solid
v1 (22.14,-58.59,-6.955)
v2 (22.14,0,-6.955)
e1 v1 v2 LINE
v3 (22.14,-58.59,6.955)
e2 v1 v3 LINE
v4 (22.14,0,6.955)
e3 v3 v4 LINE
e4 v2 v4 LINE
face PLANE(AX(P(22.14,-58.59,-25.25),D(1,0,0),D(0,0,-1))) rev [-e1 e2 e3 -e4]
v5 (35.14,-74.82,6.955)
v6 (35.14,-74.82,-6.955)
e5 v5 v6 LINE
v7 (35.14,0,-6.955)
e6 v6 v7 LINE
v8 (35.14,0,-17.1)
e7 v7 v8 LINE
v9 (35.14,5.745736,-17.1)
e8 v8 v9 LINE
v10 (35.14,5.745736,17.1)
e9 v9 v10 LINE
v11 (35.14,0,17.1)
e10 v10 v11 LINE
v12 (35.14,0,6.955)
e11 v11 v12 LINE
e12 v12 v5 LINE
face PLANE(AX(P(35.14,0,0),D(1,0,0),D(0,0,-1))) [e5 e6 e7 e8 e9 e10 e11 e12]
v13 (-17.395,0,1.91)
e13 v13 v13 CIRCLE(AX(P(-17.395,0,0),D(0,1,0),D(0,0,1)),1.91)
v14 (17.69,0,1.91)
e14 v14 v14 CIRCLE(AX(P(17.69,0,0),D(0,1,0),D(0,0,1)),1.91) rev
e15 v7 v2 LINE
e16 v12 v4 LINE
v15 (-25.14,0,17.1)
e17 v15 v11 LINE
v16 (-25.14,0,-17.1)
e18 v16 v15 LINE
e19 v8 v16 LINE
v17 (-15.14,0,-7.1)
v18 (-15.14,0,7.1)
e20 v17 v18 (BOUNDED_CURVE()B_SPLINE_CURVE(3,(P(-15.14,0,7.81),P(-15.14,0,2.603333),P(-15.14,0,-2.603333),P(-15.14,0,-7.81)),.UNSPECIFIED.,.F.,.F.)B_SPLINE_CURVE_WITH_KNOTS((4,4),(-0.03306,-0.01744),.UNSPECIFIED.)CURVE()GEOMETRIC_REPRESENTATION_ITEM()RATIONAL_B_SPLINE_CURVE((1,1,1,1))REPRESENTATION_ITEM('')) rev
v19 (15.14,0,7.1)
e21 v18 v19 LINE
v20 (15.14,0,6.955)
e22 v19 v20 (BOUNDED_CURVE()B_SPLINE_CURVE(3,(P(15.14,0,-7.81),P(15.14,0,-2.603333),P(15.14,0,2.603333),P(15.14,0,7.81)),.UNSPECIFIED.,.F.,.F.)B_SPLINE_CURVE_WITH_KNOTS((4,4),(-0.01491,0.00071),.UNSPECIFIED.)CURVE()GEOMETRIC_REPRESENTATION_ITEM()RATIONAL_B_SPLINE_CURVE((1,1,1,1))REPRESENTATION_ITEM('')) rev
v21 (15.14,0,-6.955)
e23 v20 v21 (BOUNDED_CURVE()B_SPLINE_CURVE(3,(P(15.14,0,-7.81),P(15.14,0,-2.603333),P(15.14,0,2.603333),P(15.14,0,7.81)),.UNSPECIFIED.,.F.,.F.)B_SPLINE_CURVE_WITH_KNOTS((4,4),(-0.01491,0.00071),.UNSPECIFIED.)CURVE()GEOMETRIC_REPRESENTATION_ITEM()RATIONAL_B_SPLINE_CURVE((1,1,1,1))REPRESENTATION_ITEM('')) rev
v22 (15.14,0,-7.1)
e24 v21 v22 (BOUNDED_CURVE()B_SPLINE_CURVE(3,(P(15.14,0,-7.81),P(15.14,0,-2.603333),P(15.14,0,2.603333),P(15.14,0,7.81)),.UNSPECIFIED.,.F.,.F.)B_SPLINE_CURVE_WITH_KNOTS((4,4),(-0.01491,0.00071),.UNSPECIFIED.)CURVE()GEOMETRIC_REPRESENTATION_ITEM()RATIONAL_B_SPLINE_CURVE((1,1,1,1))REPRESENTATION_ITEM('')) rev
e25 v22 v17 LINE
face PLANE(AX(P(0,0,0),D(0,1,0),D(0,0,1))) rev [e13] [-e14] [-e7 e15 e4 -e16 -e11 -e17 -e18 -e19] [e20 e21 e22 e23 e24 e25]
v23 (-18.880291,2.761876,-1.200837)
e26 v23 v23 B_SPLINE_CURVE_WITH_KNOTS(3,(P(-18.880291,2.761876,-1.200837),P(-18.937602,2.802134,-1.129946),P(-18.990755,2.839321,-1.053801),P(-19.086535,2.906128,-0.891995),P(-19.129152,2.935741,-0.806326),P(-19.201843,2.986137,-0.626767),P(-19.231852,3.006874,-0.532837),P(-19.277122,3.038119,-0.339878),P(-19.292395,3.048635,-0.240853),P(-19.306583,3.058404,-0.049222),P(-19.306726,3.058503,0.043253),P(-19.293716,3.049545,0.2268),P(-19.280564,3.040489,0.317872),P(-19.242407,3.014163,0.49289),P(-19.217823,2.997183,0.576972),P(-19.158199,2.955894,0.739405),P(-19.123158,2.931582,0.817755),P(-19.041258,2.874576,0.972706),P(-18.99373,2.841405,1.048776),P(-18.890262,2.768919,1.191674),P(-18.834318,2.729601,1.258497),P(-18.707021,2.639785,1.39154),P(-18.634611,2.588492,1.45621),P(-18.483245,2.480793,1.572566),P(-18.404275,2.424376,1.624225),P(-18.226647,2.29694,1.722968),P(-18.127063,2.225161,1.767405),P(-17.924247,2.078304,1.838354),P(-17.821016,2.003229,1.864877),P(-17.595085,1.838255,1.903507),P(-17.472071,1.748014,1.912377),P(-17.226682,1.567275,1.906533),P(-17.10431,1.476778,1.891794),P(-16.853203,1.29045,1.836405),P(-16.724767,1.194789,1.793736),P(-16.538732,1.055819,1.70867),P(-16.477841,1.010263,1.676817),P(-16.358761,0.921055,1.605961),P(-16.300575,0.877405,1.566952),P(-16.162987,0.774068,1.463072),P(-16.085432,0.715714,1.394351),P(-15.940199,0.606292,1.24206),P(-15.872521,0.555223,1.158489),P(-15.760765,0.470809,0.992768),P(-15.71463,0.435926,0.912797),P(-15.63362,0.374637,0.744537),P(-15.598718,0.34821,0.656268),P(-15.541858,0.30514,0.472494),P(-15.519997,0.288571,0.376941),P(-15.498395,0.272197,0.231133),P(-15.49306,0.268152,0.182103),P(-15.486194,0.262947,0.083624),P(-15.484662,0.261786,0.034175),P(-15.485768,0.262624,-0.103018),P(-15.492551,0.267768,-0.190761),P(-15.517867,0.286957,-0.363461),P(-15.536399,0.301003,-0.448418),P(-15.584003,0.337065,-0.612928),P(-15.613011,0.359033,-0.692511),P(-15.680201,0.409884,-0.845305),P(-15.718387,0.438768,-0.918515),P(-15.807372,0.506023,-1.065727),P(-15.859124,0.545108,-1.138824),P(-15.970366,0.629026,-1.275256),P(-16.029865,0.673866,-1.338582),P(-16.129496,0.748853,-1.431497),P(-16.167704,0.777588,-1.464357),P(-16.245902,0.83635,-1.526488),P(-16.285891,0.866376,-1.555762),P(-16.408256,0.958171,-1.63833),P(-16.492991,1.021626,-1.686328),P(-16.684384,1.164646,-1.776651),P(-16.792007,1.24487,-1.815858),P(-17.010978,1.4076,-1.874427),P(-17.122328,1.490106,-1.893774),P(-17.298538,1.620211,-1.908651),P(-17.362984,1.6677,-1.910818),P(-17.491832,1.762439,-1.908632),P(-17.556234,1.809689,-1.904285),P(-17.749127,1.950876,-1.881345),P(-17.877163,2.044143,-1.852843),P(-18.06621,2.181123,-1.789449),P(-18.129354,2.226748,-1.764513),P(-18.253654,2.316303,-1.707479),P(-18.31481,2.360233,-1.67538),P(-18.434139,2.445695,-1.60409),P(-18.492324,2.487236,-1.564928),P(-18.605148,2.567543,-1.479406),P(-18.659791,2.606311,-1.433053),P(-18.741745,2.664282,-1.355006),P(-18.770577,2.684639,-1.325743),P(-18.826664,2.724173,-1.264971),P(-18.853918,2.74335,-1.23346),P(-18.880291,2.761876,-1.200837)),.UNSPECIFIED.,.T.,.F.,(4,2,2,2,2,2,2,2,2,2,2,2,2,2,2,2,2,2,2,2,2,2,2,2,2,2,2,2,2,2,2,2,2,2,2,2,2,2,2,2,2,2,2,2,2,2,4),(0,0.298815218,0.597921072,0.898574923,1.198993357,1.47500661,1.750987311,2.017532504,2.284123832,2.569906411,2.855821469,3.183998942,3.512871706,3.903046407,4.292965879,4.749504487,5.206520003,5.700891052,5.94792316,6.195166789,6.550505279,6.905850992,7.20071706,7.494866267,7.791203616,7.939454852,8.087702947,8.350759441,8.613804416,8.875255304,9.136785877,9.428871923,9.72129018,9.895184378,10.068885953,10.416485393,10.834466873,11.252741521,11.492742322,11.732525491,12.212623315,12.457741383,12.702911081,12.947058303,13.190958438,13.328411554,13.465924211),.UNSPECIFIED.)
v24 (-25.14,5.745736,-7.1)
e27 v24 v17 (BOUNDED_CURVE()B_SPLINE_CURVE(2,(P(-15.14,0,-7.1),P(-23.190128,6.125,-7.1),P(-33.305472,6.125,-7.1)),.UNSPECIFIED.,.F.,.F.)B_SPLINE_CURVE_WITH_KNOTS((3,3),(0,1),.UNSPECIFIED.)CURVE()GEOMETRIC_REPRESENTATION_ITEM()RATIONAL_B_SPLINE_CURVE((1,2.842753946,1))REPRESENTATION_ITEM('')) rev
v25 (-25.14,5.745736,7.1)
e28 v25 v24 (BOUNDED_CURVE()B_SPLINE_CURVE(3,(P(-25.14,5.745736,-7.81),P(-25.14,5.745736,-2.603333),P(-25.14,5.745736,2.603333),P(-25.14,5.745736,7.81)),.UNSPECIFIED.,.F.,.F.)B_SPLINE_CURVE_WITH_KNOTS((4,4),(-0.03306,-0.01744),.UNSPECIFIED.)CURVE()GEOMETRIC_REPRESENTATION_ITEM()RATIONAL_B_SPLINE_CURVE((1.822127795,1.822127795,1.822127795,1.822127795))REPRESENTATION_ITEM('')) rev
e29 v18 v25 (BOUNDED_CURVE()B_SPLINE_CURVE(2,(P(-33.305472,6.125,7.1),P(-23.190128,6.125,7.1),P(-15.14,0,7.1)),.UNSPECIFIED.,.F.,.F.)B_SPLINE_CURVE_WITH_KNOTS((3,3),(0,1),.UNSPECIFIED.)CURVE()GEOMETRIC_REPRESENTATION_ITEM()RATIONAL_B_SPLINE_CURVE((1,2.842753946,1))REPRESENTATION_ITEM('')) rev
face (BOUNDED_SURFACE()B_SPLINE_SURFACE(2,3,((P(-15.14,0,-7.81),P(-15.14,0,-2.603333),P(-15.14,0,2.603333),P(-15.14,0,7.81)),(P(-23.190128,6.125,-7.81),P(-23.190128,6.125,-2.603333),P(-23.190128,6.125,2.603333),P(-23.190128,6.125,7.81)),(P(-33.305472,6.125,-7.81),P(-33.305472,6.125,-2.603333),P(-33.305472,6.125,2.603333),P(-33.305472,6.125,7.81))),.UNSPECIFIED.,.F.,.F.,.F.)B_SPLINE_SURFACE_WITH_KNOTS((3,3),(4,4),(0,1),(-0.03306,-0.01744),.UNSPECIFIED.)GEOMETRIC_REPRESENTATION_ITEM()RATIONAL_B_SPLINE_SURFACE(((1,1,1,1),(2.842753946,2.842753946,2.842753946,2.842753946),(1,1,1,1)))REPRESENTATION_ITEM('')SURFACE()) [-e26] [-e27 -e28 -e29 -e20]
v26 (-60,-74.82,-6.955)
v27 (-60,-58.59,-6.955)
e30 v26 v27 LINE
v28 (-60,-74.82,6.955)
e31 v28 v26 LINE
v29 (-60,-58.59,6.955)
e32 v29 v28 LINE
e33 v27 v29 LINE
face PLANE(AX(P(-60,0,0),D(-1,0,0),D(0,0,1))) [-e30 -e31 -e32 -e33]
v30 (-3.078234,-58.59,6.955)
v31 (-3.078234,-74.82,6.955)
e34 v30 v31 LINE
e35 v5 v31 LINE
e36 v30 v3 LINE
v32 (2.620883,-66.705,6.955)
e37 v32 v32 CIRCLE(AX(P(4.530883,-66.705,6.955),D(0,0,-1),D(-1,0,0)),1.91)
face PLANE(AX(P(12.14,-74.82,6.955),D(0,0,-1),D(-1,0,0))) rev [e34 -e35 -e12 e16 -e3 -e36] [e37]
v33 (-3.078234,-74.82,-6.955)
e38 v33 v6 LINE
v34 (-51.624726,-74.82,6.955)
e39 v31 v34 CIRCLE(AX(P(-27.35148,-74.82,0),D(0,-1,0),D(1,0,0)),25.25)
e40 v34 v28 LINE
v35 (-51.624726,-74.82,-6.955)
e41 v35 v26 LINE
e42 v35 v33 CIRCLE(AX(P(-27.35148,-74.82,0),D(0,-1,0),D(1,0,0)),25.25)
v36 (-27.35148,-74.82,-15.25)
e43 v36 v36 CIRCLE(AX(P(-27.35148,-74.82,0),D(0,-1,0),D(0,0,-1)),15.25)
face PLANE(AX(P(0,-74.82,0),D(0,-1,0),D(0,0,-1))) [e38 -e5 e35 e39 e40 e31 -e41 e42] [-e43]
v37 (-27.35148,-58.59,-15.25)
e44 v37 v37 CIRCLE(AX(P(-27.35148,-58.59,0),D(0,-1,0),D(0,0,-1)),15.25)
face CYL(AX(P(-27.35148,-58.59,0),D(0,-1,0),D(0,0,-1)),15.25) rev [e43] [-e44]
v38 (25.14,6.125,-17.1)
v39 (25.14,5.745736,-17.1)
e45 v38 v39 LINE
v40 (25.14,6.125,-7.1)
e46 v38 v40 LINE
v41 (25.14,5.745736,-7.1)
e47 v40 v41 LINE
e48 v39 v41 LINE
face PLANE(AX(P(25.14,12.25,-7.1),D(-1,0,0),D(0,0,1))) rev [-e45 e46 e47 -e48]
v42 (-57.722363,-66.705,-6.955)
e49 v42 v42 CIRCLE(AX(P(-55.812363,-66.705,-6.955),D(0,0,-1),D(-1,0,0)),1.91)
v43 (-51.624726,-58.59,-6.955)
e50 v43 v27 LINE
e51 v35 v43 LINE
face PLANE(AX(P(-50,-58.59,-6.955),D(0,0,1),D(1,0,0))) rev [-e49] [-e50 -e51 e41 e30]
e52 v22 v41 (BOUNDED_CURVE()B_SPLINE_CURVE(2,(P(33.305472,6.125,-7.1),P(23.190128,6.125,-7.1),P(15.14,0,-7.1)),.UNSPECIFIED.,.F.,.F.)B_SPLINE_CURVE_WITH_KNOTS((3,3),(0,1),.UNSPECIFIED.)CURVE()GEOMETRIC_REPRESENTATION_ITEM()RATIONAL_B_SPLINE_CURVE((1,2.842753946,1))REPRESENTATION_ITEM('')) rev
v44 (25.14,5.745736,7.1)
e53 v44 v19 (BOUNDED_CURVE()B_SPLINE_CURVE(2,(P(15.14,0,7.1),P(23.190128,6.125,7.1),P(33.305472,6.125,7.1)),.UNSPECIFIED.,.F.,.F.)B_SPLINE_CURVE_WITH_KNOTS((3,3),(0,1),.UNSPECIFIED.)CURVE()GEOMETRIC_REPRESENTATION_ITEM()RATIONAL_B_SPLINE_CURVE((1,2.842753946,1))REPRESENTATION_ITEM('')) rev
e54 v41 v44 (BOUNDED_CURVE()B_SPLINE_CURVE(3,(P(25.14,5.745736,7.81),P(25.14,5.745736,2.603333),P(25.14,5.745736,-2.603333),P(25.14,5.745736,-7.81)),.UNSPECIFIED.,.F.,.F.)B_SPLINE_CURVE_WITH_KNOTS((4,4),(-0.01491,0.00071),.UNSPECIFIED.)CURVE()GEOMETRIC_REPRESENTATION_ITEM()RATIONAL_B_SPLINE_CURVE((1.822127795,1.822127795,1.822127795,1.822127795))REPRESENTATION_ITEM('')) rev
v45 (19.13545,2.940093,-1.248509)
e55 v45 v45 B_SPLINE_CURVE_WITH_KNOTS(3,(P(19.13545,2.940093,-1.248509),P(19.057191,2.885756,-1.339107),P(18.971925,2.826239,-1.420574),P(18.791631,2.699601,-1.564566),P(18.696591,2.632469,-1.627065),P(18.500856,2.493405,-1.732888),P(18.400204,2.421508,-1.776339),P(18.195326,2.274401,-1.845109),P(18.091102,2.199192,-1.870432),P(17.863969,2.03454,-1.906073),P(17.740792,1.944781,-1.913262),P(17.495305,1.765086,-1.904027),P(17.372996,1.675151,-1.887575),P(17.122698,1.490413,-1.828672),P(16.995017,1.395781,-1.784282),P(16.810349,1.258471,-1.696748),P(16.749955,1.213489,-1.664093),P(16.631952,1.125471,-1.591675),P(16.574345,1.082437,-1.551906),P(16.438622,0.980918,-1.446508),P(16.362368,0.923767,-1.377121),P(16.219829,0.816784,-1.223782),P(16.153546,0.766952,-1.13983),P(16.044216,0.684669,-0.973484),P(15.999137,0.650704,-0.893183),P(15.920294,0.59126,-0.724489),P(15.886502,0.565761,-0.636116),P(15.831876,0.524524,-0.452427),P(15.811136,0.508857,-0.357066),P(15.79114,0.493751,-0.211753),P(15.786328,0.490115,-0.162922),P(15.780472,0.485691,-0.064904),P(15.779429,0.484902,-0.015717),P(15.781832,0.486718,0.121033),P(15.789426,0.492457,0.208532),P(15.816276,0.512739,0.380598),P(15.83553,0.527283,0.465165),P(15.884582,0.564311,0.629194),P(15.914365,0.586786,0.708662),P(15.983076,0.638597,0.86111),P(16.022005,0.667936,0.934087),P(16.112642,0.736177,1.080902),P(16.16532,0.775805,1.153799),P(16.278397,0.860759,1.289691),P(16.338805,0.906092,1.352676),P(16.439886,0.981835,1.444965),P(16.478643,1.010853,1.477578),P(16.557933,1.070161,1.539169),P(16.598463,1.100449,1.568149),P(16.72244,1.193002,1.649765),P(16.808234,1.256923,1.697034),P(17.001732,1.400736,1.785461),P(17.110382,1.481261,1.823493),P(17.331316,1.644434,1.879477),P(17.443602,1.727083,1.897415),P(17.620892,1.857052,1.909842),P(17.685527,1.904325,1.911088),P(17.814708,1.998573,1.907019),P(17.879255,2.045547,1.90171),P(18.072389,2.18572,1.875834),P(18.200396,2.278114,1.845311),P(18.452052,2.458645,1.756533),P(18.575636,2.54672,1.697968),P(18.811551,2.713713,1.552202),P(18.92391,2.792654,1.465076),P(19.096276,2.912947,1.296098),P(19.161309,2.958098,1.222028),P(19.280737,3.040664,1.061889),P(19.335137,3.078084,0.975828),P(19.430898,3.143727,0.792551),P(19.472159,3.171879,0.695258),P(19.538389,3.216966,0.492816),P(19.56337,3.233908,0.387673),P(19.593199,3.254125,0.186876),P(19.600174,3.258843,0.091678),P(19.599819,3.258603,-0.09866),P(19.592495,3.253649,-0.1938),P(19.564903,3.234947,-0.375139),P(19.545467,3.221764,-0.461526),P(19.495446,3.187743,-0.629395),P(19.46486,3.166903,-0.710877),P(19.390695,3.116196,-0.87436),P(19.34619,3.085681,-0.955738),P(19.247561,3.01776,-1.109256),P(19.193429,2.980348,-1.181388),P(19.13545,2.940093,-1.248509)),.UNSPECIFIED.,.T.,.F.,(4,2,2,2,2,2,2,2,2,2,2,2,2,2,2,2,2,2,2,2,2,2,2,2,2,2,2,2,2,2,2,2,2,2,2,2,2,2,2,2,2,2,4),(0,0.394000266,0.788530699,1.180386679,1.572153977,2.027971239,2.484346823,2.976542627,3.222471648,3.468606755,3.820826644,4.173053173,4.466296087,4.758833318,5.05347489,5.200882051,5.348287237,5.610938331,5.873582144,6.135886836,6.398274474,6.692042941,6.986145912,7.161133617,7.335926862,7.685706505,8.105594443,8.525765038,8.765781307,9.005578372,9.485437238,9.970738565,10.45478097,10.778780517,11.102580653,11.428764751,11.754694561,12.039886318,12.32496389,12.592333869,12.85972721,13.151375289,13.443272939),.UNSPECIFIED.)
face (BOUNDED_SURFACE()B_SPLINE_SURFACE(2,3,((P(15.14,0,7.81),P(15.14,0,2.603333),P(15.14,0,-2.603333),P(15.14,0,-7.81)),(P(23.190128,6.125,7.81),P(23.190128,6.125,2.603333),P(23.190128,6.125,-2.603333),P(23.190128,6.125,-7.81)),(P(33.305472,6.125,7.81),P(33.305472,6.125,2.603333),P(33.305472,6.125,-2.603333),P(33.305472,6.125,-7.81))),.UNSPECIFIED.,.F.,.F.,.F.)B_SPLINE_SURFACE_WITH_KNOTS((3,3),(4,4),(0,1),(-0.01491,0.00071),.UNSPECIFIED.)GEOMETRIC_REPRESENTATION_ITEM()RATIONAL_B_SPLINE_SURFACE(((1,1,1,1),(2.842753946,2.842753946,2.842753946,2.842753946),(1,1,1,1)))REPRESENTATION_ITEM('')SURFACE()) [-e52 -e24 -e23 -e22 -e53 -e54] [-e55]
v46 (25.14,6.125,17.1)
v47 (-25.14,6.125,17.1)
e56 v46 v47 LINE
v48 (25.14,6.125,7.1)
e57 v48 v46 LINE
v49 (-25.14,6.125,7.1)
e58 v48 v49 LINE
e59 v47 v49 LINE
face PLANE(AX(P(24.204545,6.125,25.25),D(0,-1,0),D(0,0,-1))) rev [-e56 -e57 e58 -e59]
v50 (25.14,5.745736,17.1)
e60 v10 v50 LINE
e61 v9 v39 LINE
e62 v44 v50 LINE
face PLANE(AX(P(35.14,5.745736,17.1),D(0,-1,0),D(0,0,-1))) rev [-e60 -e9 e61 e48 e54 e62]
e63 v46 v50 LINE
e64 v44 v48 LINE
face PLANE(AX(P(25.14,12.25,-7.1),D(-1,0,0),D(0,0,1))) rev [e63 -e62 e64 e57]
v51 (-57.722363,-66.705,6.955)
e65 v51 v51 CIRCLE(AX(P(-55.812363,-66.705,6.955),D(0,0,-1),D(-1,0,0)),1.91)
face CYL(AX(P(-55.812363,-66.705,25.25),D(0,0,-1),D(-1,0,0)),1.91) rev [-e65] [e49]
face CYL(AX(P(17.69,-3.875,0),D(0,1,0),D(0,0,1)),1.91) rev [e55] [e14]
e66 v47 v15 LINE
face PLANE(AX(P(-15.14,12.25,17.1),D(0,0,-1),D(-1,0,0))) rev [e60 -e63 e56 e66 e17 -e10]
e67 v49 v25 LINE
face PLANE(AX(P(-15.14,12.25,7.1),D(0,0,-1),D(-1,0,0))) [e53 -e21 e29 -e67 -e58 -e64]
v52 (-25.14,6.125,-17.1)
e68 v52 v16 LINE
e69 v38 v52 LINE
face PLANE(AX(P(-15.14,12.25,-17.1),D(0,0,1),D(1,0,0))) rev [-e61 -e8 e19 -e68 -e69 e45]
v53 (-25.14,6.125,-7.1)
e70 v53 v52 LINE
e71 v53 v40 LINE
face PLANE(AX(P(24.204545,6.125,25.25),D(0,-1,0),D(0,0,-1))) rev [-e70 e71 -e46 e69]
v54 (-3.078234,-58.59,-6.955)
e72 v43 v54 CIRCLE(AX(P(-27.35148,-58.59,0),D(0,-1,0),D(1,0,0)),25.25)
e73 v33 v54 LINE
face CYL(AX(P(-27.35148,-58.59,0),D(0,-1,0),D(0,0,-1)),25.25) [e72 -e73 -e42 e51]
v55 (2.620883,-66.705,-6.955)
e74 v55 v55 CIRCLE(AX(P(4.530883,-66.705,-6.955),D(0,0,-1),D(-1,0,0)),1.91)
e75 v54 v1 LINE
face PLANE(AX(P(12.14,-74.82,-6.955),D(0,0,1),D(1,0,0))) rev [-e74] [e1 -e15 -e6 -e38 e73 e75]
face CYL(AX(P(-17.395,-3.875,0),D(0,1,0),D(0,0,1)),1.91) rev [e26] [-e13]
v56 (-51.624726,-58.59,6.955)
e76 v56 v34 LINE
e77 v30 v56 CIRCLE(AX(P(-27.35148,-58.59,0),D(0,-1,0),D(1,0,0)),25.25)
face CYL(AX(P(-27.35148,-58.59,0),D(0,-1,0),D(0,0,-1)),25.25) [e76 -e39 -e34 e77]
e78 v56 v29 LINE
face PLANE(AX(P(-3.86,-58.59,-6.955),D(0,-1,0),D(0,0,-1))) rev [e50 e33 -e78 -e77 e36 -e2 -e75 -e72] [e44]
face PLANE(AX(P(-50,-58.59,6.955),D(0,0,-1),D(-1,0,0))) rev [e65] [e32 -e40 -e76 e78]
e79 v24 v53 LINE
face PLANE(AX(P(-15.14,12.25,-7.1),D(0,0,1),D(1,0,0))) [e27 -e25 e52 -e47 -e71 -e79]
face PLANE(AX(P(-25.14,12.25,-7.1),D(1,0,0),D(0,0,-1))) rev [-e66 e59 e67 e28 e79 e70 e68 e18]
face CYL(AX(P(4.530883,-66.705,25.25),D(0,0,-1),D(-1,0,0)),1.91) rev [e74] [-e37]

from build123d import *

# Parameters (mm, degrees)
SKETCH_1_W           = 50.28
SKETCH_1_H           = 34.2
SKETCH_1_W_2         = 30.28
SKETCH_1_H_2         = 14.2
EXTRUDE_1_DEPTH      = 12.25
SKETCH_4_W           = 13
SKETCH_4_H           = 13.91
EXTRUDE_1_2_DEPTH    = 74.82
SKETCH_5_W           = 13.91
SKETCH_5_H           = 16.23
EXTRUDE_2_DEPTH      = 16
SKETCH_7_R           = 25.25
SKETCH_7_R_2         = 15.25
EXTRUDE_2_2_DEPTH    = 16.23
SKETCH_15_R          = 1.91
CUT_EXTRUDE_6_DEPTH  = 97.964478439
SKETCH_16_W          = 13.91
SKETCH_16_H          = 16.23
EXTRUDE_4_DEPTH      = 10
SKETCH_17_R          = 1.91
CUT_EXTRUDE_7_DEPTH  = 102.16913771
SKETCH_18_W          = 49.344544624
SKETCH_18_H          = 6.125
CUT_EXTRUDE_8_DEPTH  = 105.840616652
SKETCH_19_W          = 34.2
SKETCH_19_H          = 6.125
CUT_EXTRUDE_9_DEPTH  = 10
SKETCH_21_R          = 1.91
CUT_EXTRUDE_10_DEPTH = 10
SKETCH_20_R          = 1.91
CUT_EXTRUDE_11_DEPTH = 10
FILLET_START         = -7.1
FILLET_1_DEPTH       = 14.2
FILLET_2_DEPTH       = 14.2
SKETCH_29_W          = 13.91
SKETCH_29_H          = 74.82
EXTRUDE_5_DEPTH      = 10
SKETCH_30_W          = 10
SKETCH_30_H          = 58.59
CUT_EXTRUDE_13_DEPTH = 102.16913771
SKETCH_32_W          = 34.2
SKETCH_32_H          = 5.745736365
EXTRUDE_6_DEPTH      = 10


with BuildPart() as part:
    # 草圖1 → Extrude 1 (new body)
    with BuildSketch(Plane(origin=(0, 0, 0), x_dir=(1, 0, 0), z_dir=(0, 1, 0))):
        Rectangle(SKETCH_1_W, SKETCH_1_H)
        Rectangle(SKETCH_1_W_2, SKETCH_1_H_2, mode=Mode.SUBTRACT)
    extrude(amount=EXTRUDE_1_DEPTH)

    # 草圖4 → Extrude 1 2 (add)
    with BuildSketch(Plane.XZ):
        with Locations((18.64, 0)):
            Rectangle(SKETCH_4_W, SKETCH_4_H)
    extrude(amount=EXTRUDE_1_2_DEPTH)

    # 草圖5 → Extrude 2 (add)
    with BuildSketch(Plane.ZY.offset(-12.14)):
        with Locations((0, -66.705)):
            Rectangle(SKETCH_5_W, SKETCH_5_H)
    extrude(amount=EXTRUDE_2_DEPTH)

    # 草圖7 → Extrude 2 2 (add)
    with BuildSketch(Plane(origin=(3.626674765, -74.82, 0), x_dir=(1, 0, 0), z_dir=(0, -1, 0))):
        with Locations((-30.978154344, 0)):
            Circle(SKETCH_7_R)
        with Locations((-30.978154344, 0)):
            Circle(SKETCH_7_R_2, mode=Mode.SUBTRACT)
    extrude(amount=-EXTRUDE_2_2_DEPTH)

    # 草圖15 → 除料-伸長6 (cut, through all)
    with BuildSketch(Plane(origin=(0, 0, -6.955), x_dir=(-1, 0, 0), z_dir=(0, 0, -1))):
        with Locations((-4.530883248, -66.705)):
            Circle(SKETCH_15_R)
    extrude(amount=-CUT_EXTRUDE_6_DEPTH, mode=Mode.SUBTRACT)

    # 草圖16 → 填料-伸長4 (add)
    with BuildSketch(Plane(origin=(-60, 0, 0), x_dir=(0, 0, -1), z_dir=(1, 0, 0))):
        with Locations((0, -66.705)):
            Rectangle(SKETCH_16_W, SKETCH_16_H)
    extrude(amount=EXTRUDE_4_DEPTH)

    # 草圖17 → 除料-伸長7 (cut, through all)
    with BuildSketch(Plane(origin=(0, 0, -6.955), x_dir=(-1, 0, 0), z_dir=(0, 0, -1))):
        with Locations((55.812362827, -66.705)):
            Circle(SKETCH_17_R)
    extrude(amount=-CUT_EXTRUDE_7_DEPTH, mode=Mode.SUBTRACT)

    # 草圖18 → 除料-伸長8 (cut, through all)
    with BuildSketch(Plane(origin=(0, 0, -17.1), x_dir=(-1, 0, 0), z_dir=(0, 0, -1))):
        with Locations((0.467727688, 9.1875)):
            Rectangle(SKETCH_18_W, SKETCH_18_H)
    extrude(amount=-CUT_EXTRUDE_8_DEPTH, mode=Mode.SUBTRACT)

    # 草圖19 → 除料-伸長9 (cut)
    with BuildSketch(Plane.ZY.offset(-24.204544624)):
        with Locations((0, 9.1875)):
            Rectangle(SKETCH_19_W, SKETCH_19_H)
    extrude(amount=-CUT_EXTRUDE_9_DEPTH, mode=Mode.SUBTRACT)

    # 草圖21 → 除料-伸長10 (cut)
    with BuildSketch(Plane(origin=(0, 6.125, 0), x_dir=(1, 0, 0), z_dir=(0, 1, 0))):
        with Locations(Location((17.69, 0, 0), (0, 0, 270))):
            Circle(SKETCH_21_R)
    extrude(amount=-CUT_EXTRUDE_10_DEPTH, mode=Mode.SUBTRACT)

    # 草圖20 → 除料-伸長11 (cut)
    with BuildSketch(Plane(origin=(0, 6.125, 0), x_dir=(1, 0, 0), z_dir=(0, 1, 0))):
        with Locations(Location((-17.395, 0, 0), (0, 0, 270))):
            Circle(SKETCH_20_R)
    extrude(amount=-CUT_EXTRUDE_11_DEPTH, mode=Mode.SUBTRACT)

    # 圓角1: read off the stored shape, not the designer's step
    # 圓角1 outline → 圓角1 (cut)
    with BuildSketch(Plane.XY.offset(FILLET_START)):
        with BuildLine():
            add(Edge.make_bspline(
                [(-15.14, 0), (-21.974170252, 5.199829476), (-25.14, 5.745736365)],
                knots=[0, 0, 0, 0.664102345, 0.664102345, 0.664102345], degree=2, weights=[1, 2.223777218, 1.822127795]))
            Line((-15.14, 0), (-15.14, 6.125))
            Line((-15.14, 6.125), (-25.14, 6.125))
            Line((-25.14, 6.125), (-25.14, 5.745736365))
        make_face()
    extrude(amount=FILLET_1_DEPTH, mode=Mode.SUBTRACT)

    # 圓角2: read off the stored shape, not the designer's step
    # 圓角2 outline → 圓角2 (cut)
    with BuildSketch(Plane.XY.offset(FILLET_START)):
        with BuildLine():
            Line((15.14, 6.125), (15.14, 0))
            add(Edge.make_bspline(
                [(15.14, 0), (21.974170252, 5.199829476), (25.14, 5.745736365)],
                knots=[0, 0, 0, 0.664102345, 0.664102345, 0.664102345], degree=2, weights=[1, 2.223777218, 1.822127795]))
            Line((25.14, 5.745736365), (25.14, 6.125))
            Line((25.14, 6.125), (15.14, 6.125))
        make_face()
    extrude(amount=FILLET_2_DEPTH, mode=Mode.SUBTRACT)

    # 草圖29 → 填料-伸長5 (add)
    with BuildSketch(Plane(origin=(25.14, 0, 0), x_dir=(0, 0, -1), z_dir=(1, 0, 0))):
        with Locations((0, -37.41)):
            Rectangle(SKETCH_29_W, SKETCH_29_H)
    extrude(amount=EXTRUDE_5_DEPTH)

    # 草圖30 → 除料-伸長13 (cut, through all)
    with BuildSketch(Plane.XY.offset(6.955)):
        with Locations((17.14, -29.295)):
            Rectangle(SKETCH_30_W, SKETCH_30_H)
    extrude(amount=-CUT_EXTRUDE_13_DEPTH, mode=Mode.SUBTRACT)

    # 草圖32 → 填料-伸長6 (add)
    with BuildSketch(Plane(origin=(25.14, 0, 0), x_dir=(0, 0, -1), z_dir=(1, 0, 0))):
        with Locations((0, 2.872868182)):
            Rectangle(SKETCH_32_W, SKETCH_32_H)
    extrude(amount=EXTRUDE_6_DEPTH)


solid = part.part
